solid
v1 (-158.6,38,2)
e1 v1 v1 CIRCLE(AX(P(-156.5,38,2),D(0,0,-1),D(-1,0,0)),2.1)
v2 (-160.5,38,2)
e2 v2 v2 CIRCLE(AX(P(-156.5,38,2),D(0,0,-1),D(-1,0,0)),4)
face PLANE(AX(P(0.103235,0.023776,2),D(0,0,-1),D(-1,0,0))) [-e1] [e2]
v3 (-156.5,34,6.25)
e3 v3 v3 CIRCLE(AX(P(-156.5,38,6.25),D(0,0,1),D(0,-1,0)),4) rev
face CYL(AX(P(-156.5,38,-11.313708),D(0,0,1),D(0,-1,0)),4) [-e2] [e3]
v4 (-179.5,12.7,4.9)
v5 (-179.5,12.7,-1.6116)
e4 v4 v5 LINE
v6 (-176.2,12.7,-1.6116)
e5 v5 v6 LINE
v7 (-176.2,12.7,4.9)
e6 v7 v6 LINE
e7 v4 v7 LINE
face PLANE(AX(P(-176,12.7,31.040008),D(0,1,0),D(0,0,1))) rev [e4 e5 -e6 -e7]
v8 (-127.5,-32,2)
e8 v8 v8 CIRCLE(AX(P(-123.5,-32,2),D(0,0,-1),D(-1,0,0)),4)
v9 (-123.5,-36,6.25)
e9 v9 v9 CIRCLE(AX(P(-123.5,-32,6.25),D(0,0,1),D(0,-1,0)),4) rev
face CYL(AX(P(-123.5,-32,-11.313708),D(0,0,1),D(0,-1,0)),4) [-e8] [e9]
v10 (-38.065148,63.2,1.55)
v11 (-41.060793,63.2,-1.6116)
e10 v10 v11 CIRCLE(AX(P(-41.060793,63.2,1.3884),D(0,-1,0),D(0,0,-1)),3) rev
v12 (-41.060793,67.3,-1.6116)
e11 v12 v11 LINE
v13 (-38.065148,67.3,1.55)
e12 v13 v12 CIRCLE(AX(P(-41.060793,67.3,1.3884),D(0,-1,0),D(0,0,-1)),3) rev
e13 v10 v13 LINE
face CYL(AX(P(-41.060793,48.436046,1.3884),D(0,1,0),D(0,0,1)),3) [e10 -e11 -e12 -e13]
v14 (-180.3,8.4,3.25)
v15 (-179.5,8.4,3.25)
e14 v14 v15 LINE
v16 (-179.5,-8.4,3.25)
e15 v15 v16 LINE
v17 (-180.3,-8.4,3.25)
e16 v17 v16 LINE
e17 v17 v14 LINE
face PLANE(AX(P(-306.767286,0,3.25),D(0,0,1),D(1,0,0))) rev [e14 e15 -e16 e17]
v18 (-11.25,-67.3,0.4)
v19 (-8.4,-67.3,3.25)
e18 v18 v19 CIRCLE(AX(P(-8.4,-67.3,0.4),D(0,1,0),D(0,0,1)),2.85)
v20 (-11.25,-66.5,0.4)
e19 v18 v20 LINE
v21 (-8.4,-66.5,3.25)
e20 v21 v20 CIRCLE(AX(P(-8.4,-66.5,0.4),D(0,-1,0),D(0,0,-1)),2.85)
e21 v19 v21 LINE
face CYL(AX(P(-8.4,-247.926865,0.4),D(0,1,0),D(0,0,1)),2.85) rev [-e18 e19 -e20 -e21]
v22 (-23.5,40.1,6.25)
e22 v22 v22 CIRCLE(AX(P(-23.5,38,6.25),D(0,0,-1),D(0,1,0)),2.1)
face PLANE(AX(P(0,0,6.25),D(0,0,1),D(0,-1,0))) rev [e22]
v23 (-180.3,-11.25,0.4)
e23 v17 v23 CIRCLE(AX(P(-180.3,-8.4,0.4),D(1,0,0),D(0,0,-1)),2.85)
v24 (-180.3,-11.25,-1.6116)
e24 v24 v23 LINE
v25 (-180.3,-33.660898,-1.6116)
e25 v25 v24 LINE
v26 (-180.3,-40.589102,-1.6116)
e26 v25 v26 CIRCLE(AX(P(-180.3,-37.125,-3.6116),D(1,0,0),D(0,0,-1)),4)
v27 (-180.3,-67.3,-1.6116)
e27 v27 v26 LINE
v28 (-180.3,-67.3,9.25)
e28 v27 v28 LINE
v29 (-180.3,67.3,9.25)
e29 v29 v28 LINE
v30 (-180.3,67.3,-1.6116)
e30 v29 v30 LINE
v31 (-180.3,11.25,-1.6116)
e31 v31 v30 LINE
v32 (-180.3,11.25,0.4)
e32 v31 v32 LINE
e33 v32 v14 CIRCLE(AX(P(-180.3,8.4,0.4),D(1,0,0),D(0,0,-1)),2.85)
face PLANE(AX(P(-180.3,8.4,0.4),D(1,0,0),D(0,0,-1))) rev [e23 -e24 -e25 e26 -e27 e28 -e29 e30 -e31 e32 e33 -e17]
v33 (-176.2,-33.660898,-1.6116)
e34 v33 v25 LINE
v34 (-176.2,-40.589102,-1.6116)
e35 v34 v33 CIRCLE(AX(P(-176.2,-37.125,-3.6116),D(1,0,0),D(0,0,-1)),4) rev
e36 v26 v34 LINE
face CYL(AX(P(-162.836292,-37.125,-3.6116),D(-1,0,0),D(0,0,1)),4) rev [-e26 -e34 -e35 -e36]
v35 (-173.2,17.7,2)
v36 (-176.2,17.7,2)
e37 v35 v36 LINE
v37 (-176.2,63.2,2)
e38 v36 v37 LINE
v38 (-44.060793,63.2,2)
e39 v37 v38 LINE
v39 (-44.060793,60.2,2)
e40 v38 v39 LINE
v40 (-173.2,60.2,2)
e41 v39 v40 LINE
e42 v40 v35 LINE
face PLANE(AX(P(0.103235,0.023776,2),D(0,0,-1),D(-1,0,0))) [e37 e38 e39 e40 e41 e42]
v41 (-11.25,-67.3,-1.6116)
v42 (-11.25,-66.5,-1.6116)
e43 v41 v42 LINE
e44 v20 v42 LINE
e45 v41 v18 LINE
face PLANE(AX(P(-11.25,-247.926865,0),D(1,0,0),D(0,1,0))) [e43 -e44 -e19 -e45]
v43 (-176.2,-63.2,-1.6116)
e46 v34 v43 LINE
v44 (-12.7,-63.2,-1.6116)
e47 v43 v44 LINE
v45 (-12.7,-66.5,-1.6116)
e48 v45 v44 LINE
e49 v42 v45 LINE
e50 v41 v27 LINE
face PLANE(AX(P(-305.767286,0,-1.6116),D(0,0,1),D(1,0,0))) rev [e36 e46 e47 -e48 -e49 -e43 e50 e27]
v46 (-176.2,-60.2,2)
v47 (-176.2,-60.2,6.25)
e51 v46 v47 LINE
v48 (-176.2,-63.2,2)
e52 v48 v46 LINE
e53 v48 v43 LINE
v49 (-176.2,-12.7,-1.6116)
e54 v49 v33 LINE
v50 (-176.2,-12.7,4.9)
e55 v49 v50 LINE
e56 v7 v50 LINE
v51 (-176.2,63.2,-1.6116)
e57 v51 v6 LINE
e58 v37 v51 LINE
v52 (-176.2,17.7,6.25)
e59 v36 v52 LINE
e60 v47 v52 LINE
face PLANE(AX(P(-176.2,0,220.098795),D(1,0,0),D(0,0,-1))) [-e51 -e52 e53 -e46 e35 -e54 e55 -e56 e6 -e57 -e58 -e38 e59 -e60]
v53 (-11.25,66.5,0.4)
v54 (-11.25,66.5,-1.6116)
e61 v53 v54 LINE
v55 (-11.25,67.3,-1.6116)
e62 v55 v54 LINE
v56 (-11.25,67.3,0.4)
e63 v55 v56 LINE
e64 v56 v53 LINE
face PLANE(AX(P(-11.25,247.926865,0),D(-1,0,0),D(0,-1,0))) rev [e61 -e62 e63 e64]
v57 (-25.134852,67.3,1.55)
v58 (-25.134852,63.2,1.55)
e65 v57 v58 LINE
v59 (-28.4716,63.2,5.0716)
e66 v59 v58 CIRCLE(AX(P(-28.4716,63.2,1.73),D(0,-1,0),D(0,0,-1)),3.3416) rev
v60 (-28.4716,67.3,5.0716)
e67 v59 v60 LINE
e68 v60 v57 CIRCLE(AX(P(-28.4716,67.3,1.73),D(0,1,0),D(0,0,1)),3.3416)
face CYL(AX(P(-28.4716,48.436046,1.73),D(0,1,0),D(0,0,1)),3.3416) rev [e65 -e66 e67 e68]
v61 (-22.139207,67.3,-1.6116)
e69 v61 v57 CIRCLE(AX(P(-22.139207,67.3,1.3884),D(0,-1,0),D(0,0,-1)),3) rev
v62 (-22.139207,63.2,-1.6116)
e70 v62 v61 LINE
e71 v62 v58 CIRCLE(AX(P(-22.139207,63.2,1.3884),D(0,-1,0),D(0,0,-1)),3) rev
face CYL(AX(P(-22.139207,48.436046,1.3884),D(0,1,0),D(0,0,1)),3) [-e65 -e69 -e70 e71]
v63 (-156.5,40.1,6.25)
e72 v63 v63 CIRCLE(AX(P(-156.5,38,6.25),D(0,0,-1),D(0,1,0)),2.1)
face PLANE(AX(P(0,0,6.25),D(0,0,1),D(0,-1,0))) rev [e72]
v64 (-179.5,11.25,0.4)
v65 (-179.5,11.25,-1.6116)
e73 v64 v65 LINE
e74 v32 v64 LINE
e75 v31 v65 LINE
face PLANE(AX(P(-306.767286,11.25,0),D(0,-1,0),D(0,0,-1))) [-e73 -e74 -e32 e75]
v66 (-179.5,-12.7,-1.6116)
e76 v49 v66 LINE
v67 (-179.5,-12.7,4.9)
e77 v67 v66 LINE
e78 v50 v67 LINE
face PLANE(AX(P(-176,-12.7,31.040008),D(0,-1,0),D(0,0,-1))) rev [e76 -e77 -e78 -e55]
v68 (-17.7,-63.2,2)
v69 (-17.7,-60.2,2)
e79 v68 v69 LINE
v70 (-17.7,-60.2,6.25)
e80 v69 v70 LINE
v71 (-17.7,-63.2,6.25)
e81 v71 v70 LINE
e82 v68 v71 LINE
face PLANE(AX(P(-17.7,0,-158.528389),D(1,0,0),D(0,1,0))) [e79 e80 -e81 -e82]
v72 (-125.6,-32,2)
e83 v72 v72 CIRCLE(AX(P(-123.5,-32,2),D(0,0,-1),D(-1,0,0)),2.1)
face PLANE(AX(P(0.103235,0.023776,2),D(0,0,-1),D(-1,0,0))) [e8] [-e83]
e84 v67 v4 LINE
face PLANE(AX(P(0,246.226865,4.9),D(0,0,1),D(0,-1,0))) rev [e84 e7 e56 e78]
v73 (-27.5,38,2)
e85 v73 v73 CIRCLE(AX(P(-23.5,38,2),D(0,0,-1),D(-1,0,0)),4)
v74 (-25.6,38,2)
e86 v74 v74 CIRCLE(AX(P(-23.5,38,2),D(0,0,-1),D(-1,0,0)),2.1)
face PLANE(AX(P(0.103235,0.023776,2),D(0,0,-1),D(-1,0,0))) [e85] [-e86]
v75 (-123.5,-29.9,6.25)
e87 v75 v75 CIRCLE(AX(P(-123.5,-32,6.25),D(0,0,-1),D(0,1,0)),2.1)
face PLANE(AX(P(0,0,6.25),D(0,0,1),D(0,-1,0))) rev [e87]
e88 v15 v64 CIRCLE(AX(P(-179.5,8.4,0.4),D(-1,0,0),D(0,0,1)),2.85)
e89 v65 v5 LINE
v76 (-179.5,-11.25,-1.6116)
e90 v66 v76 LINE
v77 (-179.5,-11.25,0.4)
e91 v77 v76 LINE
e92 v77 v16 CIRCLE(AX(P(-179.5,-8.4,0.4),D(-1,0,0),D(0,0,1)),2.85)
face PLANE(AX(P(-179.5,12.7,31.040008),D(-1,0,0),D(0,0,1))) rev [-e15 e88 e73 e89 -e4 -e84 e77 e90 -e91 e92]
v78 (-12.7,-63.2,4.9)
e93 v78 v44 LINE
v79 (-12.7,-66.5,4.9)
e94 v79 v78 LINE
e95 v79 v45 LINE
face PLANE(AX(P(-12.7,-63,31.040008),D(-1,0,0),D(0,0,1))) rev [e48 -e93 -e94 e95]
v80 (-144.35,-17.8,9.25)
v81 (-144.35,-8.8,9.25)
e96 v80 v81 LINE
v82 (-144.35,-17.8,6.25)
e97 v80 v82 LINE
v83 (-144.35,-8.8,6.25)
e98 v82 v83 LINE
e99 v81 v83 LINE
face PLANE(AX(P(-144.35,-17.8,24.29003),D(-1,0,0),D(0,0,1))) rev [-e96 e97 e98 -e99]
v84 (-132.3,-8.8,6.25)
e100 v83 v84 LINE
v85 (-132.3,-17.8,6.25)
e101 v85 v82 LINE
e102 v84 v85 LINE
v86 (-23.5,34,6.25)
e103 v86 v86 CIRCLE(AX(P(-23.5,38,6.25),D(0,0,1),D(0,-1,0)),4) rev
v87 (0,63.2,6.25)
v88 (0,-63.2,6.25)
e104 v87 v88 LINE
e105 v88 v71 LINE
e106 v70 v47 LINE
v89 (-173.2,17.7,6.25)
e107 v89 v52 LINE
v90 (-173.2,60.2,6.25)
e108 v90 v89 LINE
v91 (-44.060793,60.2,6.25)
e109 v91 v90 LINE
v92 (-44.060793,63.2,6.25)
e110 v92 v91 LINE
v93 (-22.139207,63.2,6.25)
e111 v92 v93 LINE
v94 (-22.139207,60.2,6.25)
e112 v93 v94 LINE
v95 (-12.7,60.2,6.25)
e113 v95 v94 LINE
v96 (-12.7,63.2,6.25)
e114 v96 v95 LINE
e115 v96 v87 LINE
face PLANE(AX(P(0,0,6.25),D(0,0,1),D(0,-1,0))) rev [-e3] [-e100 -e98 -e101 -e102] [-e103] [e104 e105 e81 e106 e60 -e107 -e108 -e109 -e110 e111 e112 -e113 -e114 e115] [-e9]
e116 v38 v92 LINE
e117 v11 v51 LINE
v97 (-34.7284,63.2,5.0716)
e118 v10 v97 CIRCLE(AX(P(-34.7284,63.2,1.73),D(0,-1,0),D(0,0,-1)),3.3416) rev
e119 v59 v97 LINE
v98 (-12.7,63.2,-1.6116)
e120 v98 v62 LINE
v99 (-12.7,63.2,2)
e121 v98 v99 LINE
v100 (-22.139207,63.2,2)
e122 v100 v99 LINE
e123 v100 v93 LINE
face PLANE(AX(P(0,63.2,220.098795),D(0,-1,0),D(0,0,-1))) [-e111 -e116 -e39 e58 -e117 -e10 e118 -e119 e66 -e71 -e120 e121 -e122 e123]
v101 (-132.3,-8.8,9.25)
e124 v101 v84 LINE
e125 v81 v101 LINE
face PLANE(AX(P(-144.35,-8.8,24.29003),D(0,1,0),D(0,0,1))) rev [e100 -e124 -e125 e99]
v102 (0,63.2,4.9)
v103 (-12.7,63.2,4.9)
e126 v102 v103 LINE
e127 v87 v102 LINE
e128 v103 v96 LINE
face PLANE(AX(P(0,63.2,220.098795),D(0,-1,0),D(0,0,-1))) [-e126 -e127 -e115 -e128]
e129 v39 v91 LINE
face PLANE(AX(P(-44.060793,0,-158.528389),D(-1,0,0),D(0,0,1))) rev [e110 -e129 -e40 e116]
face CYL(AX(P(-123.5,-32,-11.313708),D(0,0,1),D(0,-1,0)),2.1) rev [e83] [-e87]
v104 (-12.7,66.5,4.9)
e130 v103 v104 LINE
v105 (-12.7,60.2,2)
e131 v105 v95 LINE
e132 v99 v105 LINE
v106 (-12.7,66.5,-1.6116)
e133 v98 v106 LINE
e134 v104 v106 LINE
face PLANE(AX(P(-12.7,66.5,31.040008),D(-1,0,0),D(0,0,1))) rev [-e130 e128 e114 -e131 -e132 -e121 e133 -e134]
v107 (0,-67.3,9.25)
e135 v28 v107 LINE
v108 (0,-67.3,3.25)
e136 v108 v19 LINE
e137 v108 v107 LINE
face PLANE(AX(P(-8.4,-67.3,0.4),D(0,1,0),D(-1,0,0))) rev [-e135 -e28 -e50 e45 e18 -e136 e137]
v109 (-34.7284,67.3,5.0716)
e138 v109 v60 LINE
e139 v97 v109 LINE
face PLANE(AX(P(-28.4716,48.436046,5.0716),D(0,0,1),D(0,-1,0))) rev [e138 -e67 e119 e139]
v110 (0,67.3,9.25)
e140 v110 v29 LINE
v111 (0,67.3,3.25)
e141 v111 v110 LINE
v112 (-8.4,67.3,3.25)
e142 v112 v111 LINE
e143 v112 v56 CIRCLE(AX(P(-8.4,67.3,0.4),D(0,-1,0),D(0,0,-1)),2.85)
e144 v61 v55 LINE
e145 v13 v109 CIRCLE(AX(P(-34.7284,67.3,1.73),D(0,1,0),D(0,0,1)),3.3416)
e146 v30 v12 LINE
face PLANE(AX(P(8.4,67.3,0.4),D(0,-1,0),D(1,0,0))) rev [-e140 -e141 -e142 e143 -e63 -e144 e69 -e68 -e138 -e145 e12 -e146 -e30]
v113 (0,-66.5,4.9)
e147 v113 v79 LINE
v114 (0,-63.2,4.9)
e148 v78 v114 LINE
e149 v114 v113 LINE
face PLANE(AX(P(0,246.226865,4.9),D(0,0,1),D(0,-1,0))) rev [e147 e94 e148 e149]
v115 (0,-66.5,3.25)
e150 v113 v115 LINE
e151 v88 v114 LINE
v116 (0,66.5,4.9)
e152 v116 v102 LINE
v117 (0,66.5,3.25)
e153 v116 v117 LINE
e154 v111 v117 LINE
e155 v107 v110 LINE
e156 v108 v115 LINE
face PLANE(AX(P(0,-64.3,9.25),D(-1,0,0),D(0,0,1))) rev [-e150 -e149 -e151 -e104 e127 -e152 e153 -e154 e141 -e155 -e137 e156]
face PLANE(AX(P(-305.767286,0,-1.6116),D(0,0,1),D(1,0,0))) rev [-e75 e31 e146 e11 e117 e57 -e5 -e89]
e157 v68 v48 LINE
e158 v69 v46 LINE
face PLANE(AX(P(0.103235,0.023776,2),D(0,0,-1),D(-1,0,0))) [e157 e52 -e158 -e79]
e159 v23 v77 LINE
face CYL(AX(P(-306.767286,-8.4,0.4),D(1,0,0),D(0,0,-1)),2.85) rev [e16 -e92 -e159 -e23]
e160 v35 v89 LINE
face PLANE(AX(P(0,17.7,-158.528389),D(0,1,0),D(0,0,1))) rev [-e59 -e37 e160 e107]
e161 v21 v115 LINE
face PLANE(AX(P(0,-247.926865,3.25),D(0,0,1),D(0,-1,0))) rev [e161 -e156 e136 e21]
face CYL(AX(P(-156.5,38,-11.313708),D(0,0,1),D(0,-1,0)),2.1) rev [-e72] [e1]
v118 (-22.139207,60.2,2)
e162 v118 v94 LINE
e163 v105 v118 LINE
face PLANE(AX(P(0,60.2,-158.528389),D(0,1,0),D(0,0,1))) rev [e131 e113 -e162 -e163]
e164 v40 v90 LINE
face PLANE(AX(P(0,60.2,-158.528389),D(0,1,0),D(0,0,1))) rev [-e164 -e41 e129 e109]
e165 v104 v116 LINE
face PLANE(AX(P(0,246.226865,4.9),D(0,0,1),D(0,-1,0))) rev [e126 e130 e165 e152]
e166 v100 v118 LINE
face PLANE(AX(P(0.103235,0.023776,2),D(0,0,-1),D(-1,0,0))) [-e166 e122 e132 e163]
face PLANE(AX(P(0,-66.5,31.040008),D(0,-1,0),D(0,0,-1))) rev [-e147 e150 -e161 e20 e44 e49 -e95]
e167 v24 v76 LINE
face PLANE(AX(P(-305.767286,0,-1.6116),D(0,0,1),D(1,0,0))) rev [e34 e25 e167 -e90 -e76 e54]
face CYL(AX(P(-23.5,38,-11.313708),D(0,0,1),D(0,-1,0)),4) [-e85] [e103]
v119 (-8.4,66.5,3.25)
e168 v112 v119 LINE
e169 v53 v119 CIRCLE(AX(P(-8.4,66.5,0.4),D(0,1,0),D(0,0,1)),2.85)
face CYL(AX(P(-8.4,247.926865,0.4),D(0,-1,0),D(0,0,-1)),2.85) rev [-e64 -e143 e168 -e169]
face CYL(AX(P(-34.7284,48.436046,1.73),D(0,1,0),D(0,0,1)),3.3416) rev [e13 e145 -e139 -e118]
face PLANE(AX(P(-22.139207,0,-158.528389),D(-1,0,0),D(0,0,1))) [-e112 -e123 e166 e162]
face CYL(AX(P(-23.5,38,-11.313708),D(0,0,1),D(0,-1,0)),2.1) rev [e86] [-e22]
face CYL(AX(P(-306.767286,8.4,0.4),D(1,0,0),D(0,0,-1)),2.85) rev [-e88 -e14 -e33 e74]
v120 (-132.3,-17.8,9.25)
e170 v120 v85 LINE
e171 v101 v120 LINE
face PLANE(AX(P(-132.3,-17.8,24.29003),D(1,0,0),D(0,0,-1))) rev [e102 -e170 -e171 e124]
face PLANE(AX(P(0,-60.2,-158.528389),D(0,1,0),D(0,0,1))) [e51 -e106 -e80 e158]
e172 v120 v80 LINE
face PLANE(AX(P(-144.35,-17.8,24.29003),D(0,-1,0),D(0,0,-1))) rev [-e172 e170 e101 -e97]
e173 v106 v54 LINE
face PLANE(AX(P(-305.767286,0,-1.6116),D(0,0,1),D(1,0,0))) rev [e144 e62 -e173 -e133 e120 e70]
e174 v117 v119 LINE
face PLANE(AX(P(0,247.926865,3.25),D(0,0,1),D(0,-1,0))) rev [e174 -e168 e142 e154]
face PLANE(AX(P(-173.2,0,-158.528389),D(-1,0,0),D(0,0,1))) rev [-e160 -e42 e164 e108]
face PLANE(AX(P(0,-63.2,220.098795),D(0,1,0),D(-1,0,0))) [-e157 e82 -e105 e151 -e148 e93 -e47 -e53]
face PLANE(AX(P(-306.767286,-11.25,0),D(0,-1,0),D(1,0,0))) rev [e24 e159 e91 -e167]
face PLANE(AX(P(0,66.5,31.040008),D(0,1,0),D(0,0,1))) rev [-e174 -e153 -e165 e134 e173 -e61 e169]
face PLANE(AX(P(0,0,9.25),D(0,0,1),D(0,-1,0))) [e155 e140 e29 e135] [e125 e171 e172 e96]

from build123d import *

# Parameters (mm, degrees)
BOSS_EXTRUDE1_START     = 3.25
BOSS_EXTRUDE1_OUTLINE_W = 176
BOSS_EXTRUDE1_OUTLINE_H = 126
BOSS_EXTRUDE1_DEPTH     = 6
BOSS_EXTRUDE2_DEPTH     = 3.3
BOSS_EXTRUDE4_DEPTH     = 1
SKETCH7_W               = 12.05
SKETCH7_H               = 9
CUT_EXTRUDE1_DEPTH      = 6
BOSS_EXTRUDE5_DEPTH     = 3.3
BOSS_EXTRUDE7_DEPTH     = 1
BOSS_EXTRUDE8_START     = 2.6
BOSS_EXTRUDE8_DEPTH     = 2.6
BOSS_EXTRUDE9_START     = 0.7
BOSS_EXTRUDE9_DEPTH     = 0.7
BOSS_EXTRUDE10_START    = 1
BOSS_EXTRUDE10_DEPTH    = 1
SKETCH14_W              = 12.7
SKETCH14_H              = 3.5
SKETCH14_W_2            = 3.5
SKETCH14_H_2            = 25.4
CUT_EXTRUDE2_DEPTH      = 6.5116
CUT_EXTRUDE3_REACH      = 194.673
SKETCH15_R              = 4
CUT_EXTRUDE4_DEPTH      = 4.3
FILLET1_R               = 3
CUT_EXTRUDE5_START      = -4.8616
CUT_EXTRUDE5_DEPTH      = 4.8616
SKETCH19_W              = 176.2
SKETCH19_H              = 126.4
CUT_EXTRUDE6_DEPTH      = 3
SKETCH16_R              = 4
SKETCH16_R_2            = 2.1
BOSS_EXTRUDE11_DEPTH    = 4.25
SKETCH20_W              = 129.139207087
SKETCH20_H              = 3
SKETCH20_W_2            = 9.439207087
SKETCH20_W_3            = 158.5
BOSS_EXTRUDE12_DEPTH    = 4.25


# Read off the part's stored shape, not the designer's step: Boss-Extrude1, Cut-Extrude5
with BuildPart() as part:
    # Boss-Extrude1 outline → Boss-Extrude1 (new body)
    with BuildSketch(Plane.XY.offset(BOSS_EXTRUDE1_START)):
        with Locations((-88, 0)):
            Rectangle(BOSS_EXTRUDE1_OUTLINE_W, BOSS_EXTRUDE1_OUTLINE_H)
    extrude(amount=BOSS_EXTRUDE1_DEPTH)

    # Sketch3 → Boss-Extrude2 (add)
    with BuildSketch(Plane.ZY.offset(176)):
        with BuildLine():
            Line((9.25, -63), (9.25, 63))
            Line((9.25, 63), (-1.6116, 63))
            Line((-1.6116, 63), (-1.6116, 12.5))
            Line((-1.6116, 12.5), (0.4, 12.5))
            ThreePointArc((0.4, 12.5), (3.228427125, 11.328427125), (4.4, 8.5))
            Line((4.4, 8.5), (4.4, -8.5))
            ThreePointArc((4.4, -8.5), (3.228427125, -11.328427125), (0.4, -12.5))
            Line((0.4, -12.5), (-1.6116, -12.5))
            Line((-1.6116, -12.5), (-1.6116, -63))
            Line((-1.6116, -63), (9.25, -63))
        make_face()
    extrude(amount=BOSS_EXTRUDE2_DEPTH)

    # Sketch6 → Boss-Extrude4 (add)
    with BuildSketch(Plane.ZY.offset(179.3)):
        with BuildLine():
            Line((9.25, -63), (9.25, 63))
            Line((9.25, 63), (-1.6116, 63))
            Line((-1.6116, 63), (-1.6116, 11.25))
            Line((-1.6116, 11.25), (0.4, 11.25))
            ThreePointArc((0.4, 11.25), (2.415254326, 10.415254326), (3.25, 8.4))
            Line((3.25, 8.4), (3.25, -8.4))
            ThreePointArc((3.25, -8.4), (2.415254326, -10.415254326), (0.4, -11.25))
            Line((0.4, -11.25), (-1.6116, -11.25))
            Line((-1.6116, -11.25), (-1.6116, -63))
            Line((-1.6116, -63), (9.25, -63))
        make_face()
    extrude(amount=BOSS_EXTRUDE4_DEPTH)

    # Sketch7 → Cut-Extrude1 (cut)
    with BuildSketch(Plane(origin=(0, 0, 3.25), x_dir=(-1, 0, 0), z_dir=(0, 0, -1))):
        with Locations((138.325, -13.3)):
            Rectangle(SKETCH7_W, SKETCH7_H)
    extrude(amount=-CUT_EXTRUDE1_DEPTH, mode=Mode.SUBTRACT)

    # Sketch8 → Boss-Extrude5 (add)
    with BuildSketch(Plane.XZ.offset(63)):
        with BuildLine():
            Line((0, 9.25), (-180.3, 9.25))
            Line((-180.3, 9.25), (-180.3, -1.6116))
            Line((-180.3, -1.6116), (-11.957378406, -1.6116))
            ThreePointArc((-11.957378406, -1.6116), (-11.96744863, 2.394191566), (-8.5, 4.4))
            Line((-8.5, 4.4), (0, 4.4))
            Line((0, 4.4), (0, 9.25))
        make_face()
    extrude(amount=BOSS_EXTRUDE5_DEPTH)

    # Sketch10 → Boss-Extrude7 (add)
    with BuildSketch(Plane.XZ.offset(66.3)):
        with BuildLine():
            Line((0, 9.25), (-180.3, 9.25))
            Line((-180.3, 9.25), (-180.3, -1.6116))
            Line((-180.3, -1.6116), (-11.25, -1.6116))
            Line((-11.25, -1.6116), (-11.25, 0.4))
            ThreePointArc((-11.25, 0.4), (-10.415254326, 2.415254326), (-8.4, 3.25))
            Line((-8.4, 3.25), (0, 3.25))
            Line((0, 3.25), (0, 9.25))
        make_face()
    extrude(amount=BOSS_EXTRUDE7_DEPTH)

    # Sketch11 → Boss-Extrude8 (add)
    with BuildSketch(Plane(origin=(0, 63, 0), x_dir=(1, 0, 0), z_dir=(0, 1, 0)).offset(BOSS_EXTRUDE8_START)):
        with BuildLine():
            Line((-180.3, -9.25), (0, -9.25))
            Line((0, -9.25), (0, -4.4))
            Line((0, -4.4), (-8.5, -4.4))
            ThreePointArc((-8.5, -4.4), (-11.96744863, -2.394191566), (-11.957378406, 1.6116))
            Line((-11.957378406, 1.6116), (-180.3, 1.6116))
            Line((-180.3, 1.6116), (-180.3, -9.25))
        make_face()
    extrude(amount=-BOSS_EXTRUDE8_DEPTH)

    # Sketch12 → Boss-Extrude9 (add)
    with BuildSketch(Plane(origin=(0, 65.6, 0), x_dir=(1, 0, 0), z_dir=(0, 1, 0)).offset(BOSS_EXTRUDE9_START)):
        with BuildLine():
            Line((-180.3, -9.25), (0, -9.25))
            Line((0, -9.25), (0, -4.4))
            Line((0, -4.4), (-8.5, -4.4))
            ThreePointArc((-8.5, -4.4), (-11.96744863, -2.394191566), (-11.957378406, 1.6116))
            Line((-11.957378406, 1.6116), (-180.3, 1.6116))
            Line((-180.3, 1.6116), (-180.3, -9.25))
        make_face()
    extrude(amount=-BOSS_EXTRUDE9_DEPTH)

    # Sketch13 → Boss-Extrude10 (add)
    with BuildSketch(Plane(origin=(0, 66.3, 0), x_dir=(1, 0, 0), z_dir=(0, 1, 0)).offset(BOSS_EXTRUDE10_START)):
        with BuildLine():
            Line((-180.3, -9.25), (0, -9.25))
            Line((0, -9.25), (0, -3.25))
            Line((0, -3.25), (-8.4, -3.25))
            ThreePointArc((-8.4, -3.25), (-10.415254326, -2.415254326), (-11.25, -0.4))
            Line((-11.25, -0.4), (-11.25, 1.6116))
            Line((-11.25, 1.6116), (-180.3, 1.6116))
            Line((-180.3, 1.6116), (-180.3, -9.25))
        make_face()
    extrude(amount=-BOSS_EXTRUDE10_DEPTH)

    # Sketch14 → Cut-Extrude2 (cut)
    with BuildSketch(Plane(origin=(0, 0, -1.6116), x_dir=(-1, 0, 0), z_dir=(0, 0, -1))):
        with Locations((6.35, 64.75)):
            Rectangle(SKETCH14_W, SKETCH14_H)
        with Locations((177.75, 0)):
            Rectangle(SKETCH14_W_2, SKETCH14_H_2)
        with Locations((6.35, -64.75)):
            Rectangle(SKETCH14_W, SKETCH14_H)
    extrude(amount=-CUT_EXTRUDE2_DEPTH, mode=Mode.SUBTRACT)

    # Sketch15 → Cut-Extrude3 (cut, up to next)
    with BuildSketch(Plane.ZY.offset(180.3), mode=Mode.PRIVATE) as cut_extrude3_sk1:
        with Locations((-3.6116, -37.125)):
            Circle(SKETCH15_R)
    cut_extrude3_tool1 = extrude(cut_extrude3_sk1.sketch, amount=-CUT_EXTRUDE3_REACH, mode=Mode.PRIVATE) & part.part
    add(cut_extrude3_tool1.solids().sort_by_distance((-180.3, -37.125, -3.6116))[0], mode=Mode.SUBTRACT)

    # Sketch17 → Cut-Extrude4 (cut)
    with BuildSketch(Plane(origin=(0, 67.3, 0), x_dir=(1, 0, 0), z_dir=(0, 1, 0))):
        with BuildLine():
            Line((-28.4716, -5.0716), (-34.7284, -5.0716))
            ThreePointArc((-34.7284, -5.0716), (-38.07, -1.73), (-34.7284, 1.6116))
            Line((-34.7284, 1.6116), (-28.4716, 1.6116))
            ThreePointArc((-28.4716, 1.6116), (-25.13, -1.73), (-28.4716, -5.0716))
        make_face()
    extrude(amount=-CUT_EXTRUDE4_DEPTH, mode=Mode.SUBTRACT)

    # Fillet1
    fillet1_edges = [part.edges().sort_by_distance(p)[0] for p in [
        (-34.7284, 65.15, -1.6116),
    ]]
    fillet(fillet1_edges, radius=FILLET1_R)
    fillet1_2_edges = [part.edges().sort_by_distance(p)[0] for p in [
        (-28.4716, 65.15, -1.6116),
    ]]
    fillet(fillet1_2_edges, radius=FILLET1_R)

    # Cut-Extrude5 outline → Cut-Extrude5 (cut)
    with BuildSketch(Plane(origin=(0, 0, -1.6116), x_dir=(-1, 0, 0), z_dir=(0, 0, -1)).offset(CUT_EXTRUDE5_START)):
        Polygon((176, 63), (176, -63), (0, -63), (0, -63.2), (176.2, -63.2), (176.2, 63.2), (0, 63.2), (0, 63), align=None)
    extrude(amount=CUT_EXTRUDE5_DEPTH, mode=Mode.SUBTRACT)

    # Sketch19 → Cut-Extrude6 (cut)
    with BuildSketch(Plane(origin=(0, 0, 3.25), x_dir=(-1, 0, 0), z_dir=(0, 0, -1))):
        with Locations((88.1, 0)):
            Rectangle(SKETCH19_W, SKETCH19_H)
    extrude(amount=-CUT_EXTRUDE6_DEPTH, mode=Mode.SUBTRACT)

    # Sketch16 → Boss-Extrude11 (add)
    # profile 1 of 3: a face of its own
    with BuildSketch(Plane(origin=(0, 0, 6.25), x_dir=(-1, 0, 0), z_dir=(0, 0, -1))):
        with Locations(Location((156.5, 38, 0), (0, 0, 270))):
            Circle(SKETCH16_R)
        with Locations((156.5, 38)):
            Circle(SKETCH16_R_2, mode=Mode.SUBTRACT)
    # profile 2 of 3: a face of its own
    with BuildSketch(Plane(origin=(0, 0, 6.25), x_dir=(-1, 0, 0), z_dir=(0, 0, -1))):
        with Locations(Location((23.5, 38, 0), (0, 0, 270))):
            Circle(SKETCH16_R)
        with Locations((23.5, 38)):
            Circle(SKETCH16_R_2, mode=Mode.SUBTRACT)
    # profile 3 of 3: a face of its own
    with BuildSketch(Plane(origin=(0, 0, 6.25), x_dir=(-1, 0, 0), z_dir=(0, 0, -1))):
        with Locations(Location((123.5, -32, 0), (0, 0, 270))):
            Circle(SKETCH16_R)
        with Locations((123.5, -32)):
            Circle(SKETCH16_R_2, mode=Mode.SUBTRACT)
    extrude(amount=BOSS_EXTRUDE11_DEPTH)

    # Sketch20 → Boss-Extrude12 (add)
    with BuildSketch(Plane(origin=(0, 0, 6.25), x_dir=(-1, 0, 0), z_dir=(0, 0, -1))):
        with Locations((108.630396457, 61.7)):
            Rectangle(SKETCH20_W, SKETCH20_H)
        with Locations((17.419603544, 61.7)):
            Rectangle(SKETCH20_W_2, SKETCH20_H)
        Polygon((173.2, 17.7), (176.2, 17.7), (176.2, 63.2), (173.2, 63.2), (173.2, 60.2), align=None)
        with Locations((96.95, -61.7)):
            Rectangle(SKETCH20_W_3, SKETCH20_H)
    extrude(amount=BOSS_EXTRUDE12_DEPTH)


solid = part.part
